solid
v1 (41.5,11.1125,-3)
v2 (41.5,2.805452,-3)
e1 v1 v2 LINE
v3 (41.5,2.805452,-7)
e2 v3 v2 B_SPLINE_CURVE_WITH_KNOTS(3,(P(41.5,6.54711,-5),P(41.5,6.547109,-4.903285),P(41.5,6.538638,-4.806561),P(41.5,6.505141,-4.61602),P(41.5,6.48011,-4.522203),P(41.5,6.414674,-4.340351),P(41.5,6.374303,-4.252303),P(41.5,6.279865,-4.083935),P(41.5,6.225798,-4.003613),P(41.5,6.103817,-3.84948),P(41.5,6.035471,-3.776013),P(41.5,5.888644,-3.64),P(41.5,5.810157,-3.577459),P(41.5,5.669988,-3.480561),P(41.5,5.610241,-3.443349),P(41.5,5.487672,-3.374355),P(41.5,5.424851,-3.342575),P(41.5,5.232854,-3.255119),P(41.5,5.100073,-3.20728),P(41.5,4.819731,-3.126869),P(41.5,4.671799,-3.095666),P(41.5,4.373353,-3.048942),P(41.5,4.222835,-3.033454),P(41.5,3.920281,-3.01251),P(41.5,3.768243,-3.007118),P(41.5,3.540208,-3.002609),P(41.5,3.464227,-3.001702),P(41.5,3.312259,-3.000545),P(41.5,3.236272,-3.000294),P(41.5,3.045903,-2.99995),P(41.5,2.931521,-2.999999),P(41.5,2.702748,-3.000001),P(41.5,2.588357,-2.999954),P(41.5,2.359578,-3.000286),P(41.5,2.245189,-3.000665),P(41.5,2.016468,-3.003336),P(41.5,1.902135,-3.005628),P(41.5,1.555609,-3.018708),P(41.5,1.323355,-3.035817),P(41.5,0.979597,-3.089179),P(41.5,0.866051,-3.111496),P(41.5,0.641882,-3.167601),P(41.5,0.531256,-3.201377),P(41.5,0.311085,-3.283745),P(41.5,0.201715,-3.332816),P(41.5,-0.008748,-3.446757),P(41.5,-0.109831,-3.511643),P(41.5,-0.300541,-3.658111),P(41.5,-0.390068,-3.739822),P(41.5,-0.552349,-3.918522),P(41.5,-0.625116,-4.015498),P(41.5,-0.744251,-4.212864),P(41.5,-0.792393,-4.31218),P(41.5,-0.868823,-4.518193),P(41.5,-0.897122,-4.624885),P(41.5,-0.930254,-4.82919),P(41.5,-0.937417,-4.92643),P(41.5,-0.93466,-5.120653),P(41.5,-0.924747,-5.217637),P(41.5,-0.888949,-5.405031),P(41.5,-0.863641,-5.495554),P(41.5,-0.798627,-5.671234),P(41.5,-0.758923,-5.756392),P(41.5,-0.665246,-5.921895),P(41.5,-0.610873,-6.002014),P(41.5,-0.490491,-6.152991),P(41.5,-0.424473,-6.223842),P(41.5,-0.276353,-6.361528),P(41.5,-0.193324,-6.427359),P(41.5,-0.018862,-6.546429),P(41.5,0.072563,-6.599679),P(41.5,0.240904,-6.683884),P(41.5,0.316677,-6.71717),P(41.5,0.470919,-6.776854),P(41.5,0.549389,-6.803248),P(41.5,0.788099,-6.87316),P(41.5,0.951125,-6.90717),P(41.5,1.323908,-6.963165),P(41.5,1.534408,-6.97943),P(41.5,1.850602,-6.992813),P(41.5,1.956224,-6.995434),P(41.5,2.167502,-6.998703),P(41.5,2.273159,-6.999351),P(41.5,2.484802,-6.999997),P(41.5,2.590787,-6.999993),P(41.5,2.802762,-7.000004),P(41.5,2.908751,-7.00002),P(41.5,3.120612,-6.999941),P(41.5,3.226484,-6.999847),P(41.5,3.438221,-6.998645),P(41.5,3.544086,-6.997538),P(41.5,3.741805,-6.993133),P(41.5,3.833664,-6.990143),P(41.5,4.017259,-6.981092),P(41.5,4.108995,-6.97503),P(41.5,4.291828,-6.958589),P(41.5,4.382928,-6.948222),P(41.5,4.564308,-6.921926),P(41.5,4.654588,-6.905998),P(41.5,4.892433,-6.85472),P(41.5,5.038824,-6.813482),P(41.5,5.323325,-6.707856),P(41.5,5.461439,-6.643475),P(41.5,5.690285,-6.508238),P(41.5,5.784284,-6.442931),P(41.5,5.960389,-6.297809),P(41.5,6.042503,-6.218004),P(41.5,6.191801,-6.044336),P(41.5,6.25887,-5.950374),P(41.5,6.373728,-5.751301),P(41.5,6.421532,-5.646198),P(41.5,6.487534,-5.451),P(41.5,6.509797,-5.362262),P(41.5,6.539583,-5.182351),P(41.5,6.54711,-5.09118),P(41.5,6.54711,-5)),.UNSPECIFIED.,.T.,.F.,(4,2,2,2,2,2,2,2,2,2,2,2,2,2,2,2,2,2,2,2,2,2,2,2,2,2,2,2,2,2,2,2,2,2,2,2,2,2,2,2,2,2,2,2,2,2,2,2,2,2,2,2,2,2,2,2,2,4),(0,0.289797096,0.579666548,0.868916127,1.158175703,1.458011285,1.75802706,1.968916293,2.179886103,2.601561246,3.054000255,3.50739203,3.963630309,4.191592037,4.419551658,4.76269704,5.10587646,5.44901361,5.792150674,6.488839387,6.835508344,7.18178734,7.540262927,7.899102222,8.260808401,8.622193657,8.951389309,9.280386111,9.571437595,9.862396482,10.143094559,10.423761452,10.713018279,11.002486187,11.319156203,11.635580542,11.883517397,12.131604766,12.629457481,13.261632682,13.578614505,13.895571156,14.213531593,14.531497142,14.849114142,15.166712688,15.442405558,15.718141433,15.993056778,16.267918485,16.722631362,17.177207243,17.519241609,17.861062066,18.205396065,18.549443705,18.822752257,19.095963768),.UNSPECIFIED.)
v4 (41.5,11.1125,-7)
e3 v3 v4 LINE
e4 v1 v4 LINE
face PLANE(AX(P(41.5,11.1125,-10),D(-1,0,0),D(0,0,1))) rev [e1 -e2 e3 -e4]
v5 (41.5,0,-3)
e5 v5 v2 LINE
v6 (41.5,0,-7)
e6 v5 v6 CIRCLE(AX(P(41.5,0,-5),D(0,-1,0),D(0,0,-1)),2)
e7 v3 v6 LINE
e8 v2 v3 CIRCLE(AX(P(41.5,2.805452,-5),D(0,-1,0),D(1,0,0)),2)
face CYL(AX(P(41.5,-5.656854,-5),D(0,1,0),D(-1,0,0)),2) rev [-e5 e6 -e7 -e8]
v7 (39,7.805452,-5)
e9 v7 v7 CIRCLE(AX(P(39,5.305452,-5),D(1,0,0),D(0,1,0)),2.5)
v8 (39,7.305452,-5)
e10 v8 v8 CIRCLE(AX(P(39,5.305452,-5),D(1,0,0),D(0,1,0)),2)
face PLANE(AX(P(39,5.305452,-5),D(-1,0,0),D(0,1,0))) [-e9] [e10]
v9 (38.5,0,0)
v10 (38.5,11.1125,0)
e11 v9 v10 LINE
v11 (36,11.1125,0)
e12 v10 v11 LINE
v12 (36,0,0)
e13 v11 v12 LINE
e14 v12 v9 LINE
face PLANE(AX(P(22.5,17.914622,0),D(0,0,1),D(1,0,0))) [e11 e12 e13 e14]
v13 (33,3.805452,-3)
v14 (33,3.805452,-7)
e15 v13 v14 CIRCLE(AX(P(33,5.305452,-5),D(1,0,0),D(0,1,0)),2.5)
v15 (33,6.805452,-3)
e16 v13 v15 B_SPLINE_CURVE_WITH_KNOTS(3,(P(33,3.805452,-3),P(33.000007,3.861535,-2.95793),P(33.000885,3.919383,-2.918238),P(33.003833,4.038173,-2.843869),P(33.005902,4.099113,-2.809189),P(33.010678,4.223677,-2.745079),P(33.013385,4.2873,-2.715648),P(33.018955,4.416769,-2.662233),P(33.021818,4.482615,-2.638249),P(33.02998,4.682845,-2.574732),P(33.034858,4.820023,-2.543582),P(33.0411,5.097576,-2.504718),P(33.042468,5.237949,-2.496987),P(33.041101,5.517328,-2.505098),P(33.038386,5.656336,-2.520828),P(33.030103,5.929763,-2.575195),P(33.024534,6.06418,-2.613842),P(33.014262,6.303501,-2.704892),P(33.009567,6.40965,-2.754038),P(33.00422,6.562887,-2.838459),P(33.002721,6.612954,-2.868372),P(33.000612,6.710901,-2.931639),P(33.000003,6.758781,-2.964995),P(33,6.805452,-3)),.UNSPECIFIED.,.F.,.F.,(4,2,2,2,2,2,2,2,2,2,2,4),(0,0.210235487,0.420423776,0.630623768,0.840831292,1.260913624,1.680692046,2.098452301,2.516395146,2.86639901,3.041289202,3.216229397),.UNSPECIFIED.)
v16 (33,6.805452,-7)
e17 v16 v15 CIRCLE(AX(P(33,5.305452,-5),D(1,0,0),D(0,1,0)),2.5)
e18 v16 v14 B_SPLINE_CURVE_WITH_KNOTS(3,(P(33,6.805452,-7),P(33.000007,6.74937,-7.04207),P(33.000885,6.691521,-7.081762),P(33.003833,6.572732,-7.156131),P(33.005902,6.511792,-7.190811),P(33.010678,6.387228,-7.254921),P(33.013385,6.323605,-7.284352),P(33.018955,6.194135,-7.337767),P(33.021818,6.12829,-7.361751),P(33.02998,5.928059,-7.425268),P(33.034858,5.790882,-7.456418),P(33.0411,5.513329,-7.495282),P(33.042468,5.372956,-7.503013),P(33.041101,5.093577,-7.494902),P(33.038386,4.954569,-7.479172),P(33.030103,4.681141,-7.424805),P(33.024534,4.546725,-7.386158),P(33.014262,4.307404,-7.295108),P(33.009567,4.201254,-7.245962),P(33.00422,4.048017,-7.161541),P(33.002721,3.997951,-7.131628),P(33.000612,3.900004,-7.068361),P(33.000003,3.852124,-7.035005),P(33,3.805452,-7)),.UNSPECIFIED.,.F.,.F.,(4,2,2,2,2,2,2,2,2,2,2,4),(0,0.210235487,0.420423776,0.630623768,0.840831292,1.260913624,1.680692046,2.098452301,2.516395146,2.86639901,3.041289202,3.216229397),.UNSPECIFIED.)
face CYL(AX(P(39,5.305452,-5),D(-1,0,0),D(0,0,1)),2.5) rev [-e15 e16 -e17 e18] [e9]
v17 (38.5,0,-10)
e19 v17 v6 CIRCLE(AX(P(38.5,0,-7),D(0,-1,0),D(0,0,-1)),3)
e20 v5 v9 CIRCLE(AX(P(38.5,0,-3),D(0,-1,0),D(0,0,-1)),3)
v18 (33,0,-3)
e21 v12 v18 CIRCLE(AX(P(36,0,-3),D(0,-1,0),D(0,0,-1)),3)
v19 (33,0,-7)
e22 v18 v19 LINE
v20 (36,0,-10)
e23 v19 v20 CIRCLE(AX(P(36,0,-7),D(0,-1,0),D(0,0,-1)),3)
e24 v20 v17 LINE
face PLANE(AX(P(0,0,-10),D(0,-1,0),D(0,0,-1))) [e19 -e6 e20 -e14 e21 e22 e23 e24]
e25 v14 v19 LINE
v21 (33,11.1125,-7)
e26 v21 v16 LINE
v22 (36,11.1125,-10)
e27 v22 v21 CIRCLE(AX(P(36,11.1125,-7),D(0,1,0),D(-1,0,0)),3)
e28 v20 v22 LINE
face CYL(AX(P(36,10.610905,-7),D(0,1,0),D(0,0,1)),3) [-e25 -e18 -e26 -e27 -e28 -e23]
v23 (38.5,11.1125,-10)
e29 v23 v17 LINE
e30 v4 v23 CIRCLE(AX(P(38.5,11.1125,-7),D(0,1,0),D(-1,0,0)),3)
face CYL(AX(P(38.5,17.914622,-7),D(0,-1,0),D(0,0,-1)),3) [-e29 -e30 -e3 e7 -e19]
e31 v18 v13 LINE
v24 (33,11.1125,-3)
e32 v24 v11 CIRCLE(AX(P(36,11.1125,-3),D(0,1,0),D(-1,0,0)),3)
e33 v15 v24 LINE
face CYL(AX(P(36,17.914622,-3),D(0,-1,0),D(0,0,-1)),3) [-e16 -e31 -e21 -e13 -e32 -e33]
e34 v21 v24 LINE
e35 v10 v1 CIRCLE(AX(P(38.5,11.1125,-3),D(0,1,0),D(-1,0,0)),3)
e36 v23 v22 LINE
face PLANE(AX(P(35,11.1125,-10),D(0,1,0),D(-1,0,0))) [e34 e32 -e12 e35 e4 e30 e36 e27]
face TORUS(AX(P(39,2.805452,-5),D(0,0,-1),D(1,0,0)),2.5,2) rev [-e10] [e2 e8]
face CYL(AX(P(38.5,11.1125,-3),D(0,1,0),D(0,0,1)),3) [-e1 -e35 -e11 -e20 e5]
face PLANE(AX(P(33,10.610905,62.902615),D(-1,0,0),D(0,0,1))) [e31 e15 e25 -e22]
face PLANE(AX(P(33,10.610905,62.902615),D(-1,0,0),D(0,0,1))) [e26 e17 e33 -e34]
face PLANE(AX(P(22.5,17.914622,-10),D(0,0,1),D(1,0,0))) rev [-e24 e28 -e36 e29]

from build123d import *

# Parameters (mm, degrees)
BOSS_EXTRUDE1_DEPTH     = 10
CUT_EXTRUDE2_DEPTH      = 50.456381745
CUT_EXTRUDE2_DEPTH_BACK = 50.456381745
SKETCH3_R               = 2.5
CUT_EXTRUDE3_DEPTH      = 6
SKETCH4_R               = 2
CUT_REVOLVE1_ANGLE      = 90
SKETCH5_R               = 2
CUT_EXTRUDE4_DEPTH      = 2.805452299
FILLET1_R               = 5
SKETCH6_W               = 10
SKETCH6_H               = 29.685485307
CUT_EXTRUDE5_DEPTH      = 33
SKETCH7_W               = 19.76767366
SKETCH7_H               = 10
CUT_EXTRUDE6_DEPTH      = 48.418220859
SKETCH8_W               = 3.5
SKETCH8_H               = 11.210857043
CUT_EXTRUDE7_DEPTH      = 48.41822072
FILLET2_R               = 3


with BuildPart() as part:
    # Sketch1 → Boss-Extrude1 (new body)
    with BuildSketch(Plane.XY):
        with BuildLine():
            Line((0, 0), (45, 0))
            Line((45, 0), (45, 11.1125))
            Line((45, 11.1125), (35, 11.1125))
            add(Edge.make_bspline(
                [(10, 11.1125), (14.576625097, 20.181995974), (30.423374903, 20.181995974), (35, 11.1125)],
                knots=[0, 0, 0, 0, 1, 1, 1, 1], degree=3))
            Line((10, 11.1125), (0, 11.1125))
            Line((0, 11.1125), (0, 0))
        make_face()
    extrude(amount=-BOSS_EXTRUDE1_DEPTH)

    # Sketch2 → Cut-Extrude2 (cut, two sides: drawn at the far end of the back side and taken through both)
    with BuildSketch(Plane.XY.offset(-CUT_EXTRUDE2_DEPTH_BACK)):
        with BuildLine():
            Line((33, 0), (33, 10.610904597))
            add(Edge.make_bspline(
                [(33, 10.610904597), (32.518518069, 11.455367364), (31.27134268, 12.982349636), (27.931157473, 15.20113612), (22.5, 16.390279221), (17.068842527, 15.20113612), (13.72865732, 12.982349636), (12.481481931, 11.455367364), (12, 10.610904597)],
                knots=[0.018308459, 0.018308459, 0.018308459, 0.018308459, 0.138731344, 0.25915423, 0.5, 0.74084577, 0.861268656, 0.981691541, 0.981691541, 0.981691541, 0.981691541], degree=3))
            Line((12, 10.610904597), (12, 0))
            Line((12, 0), (33, 0))
        make_face()
    extrude(amount=CUT_EXTRUDE2_DEPTH + CUT_EXTRUDE2_DEPTH_BACK, mode=Mode.SUBTRACT)

    # Sketch3 → Cut-Extrude3 (cut)
    with BuildSketch(Plane(origin=(12, 0, 0), x_dir=(0, 0, -1), z_dir=(1, 0, 0))):
        with Locations(Location((5, 5.305452299, 0), (0, 0, 90))):
            Circle(SKETCH3_R)
    cut_extrude3 = extrude(amount=-CUT_EXTRUDE3_DEPTH, mode=Mode.SUBTRACT)

    # Sketch4 → Cut-Revolve1 (revolve, cut)
    with BuildSketch(Plane(origin=(6, 0, 0), x_dir=(0, 0, -1), z_dir=(1, 0, 0))):
        with Locations((5, 5.305452299)):
            Circle(SKETCH4_R)
    cut_revolve1 = revolve(axis=Axis((6, 2.805452299, -5), (0, 0, 1)), revolution_arc=CUT_REVOLVE1_ANGLE, mode=Mode.SUBTRACT)

    # Sketch5 → Cut-Extrude4 (cut)
    with BuildSketch(Plane(origin=(0, 2.805452299, 0), x_dir=(1, 0, 0), z_dir=(0, 1, 0))):
        with Locations(Location((3.5, 5, 0), (0, 0, 180))):
            Circle(SKETCH5_R)
    cut_extrude4 = extrude(amount=-CUT_EXTRUDE4_DEPTH, mode=Mode.SUBTRACT)

    # Mirror1: Cut-Extrude3, Cut-Revolve1, Cut-Extrude4 across plane
    add(cut_extrude3.mirror(Plane(origin=(22.5, 0, 0), x_dir=(0, 0, 1), z_dir=(1, 0, 0))), mode=Mode.SUBTRACT)
    add(cut_revolve1.mirror(Plane(origin=(22.5, 0, 0), x_dir=(0, 0, 1), z_dir=(1, 0, 0))), mode=Mode.SUBTRACT)
    add(cut_extrude4.mirror(Plane(origin=(22.5, 0, 0), x_dir=(0, 0, 1), z_dir=(1, 0, 0))), mode=Mode.SUBTRACT)

    # Fillet1
    fillet1_edges = [part.edges().sort_by_distance(p)[0] for p in [
        (10, 11.1125, -5),
        (35, 11.1125, -5),
        (33, 10.610904597, -5),
        (12, 10.610904597, -5),
    ]]
    fillet(fillet1_edges, radius=FILLET1_R)

    # Sketch6 → Cut-Extrude5 (cut)
    with BuildSketch(Plane.ZY):
        with Locations((-5, 14.842742654)):
            Rectangle(SKETCH6_W, SKETCH6_H)
    extrude(amount=-CUT_EXTRUDE5_DEPTH, mode=Mode.SUBTRACT)

    # Sketch7 → Cut-Extrude6 (cut, through all)
    with BuildSketch(Plane(origin=(0, 11.1125, 0), x_dir=(1, 0, 0), z_dir=(0, 1, 0))):
        with Locations((35.11616317, 5)):
            Rectangle(SKETCH7_W, SKETCH7_H)
    extrude(amount=CUT_EXTRUDE6_DEPTH, mode=Mode.SUBTRACT)

    # Sketch8 → Cut-Extrude7 (cut, through all)
    with BuildSketch(Plane.XZ):
        with Locations((43.25, -4.394571478)):
            Rectangle(SKETCH8_W, SKETCH8_H)
    extrude(amount=-CUT_EXTRUDE7_DEPTH, mode=Mode.SUBTRACT)

    # Fillet2
    # the kernel refuses this fillet: 3 mm, written as the material it takes off along each edge
    with BuildSketch(Plane(origin=(33, 18.6125, -10), x_dir=(0, 0, 1), z_dir=(0, -1, 0)), Plane(origin=(33, 18.6125, 0), x_dir=(1, 0, 0), z_dir=(0, -1, 0)), Plane(origin=(41.5, -7.5, -10), x_dir=(0, 0, 1), z_dir=(0, 1, 0))) as fillet2_piece_1:
        with BuildLine():
            CenterArc((FILLET2_R, -FILLET2_R), FILLET2_R, 90, 90)
            Line((0, -FILLET2_R), (0, 0))
            Line((0, 0), (FILLET2_R, 0))
        make_face()
    extrude(amount=26.1125, mode=Mode.SUBTRACT)
    with BuildSketch(Plane(origin=(41.5, 18.6125, 0), x_dir=(-1, 0, 0), z_dir=(0, -1, 0))) as fillet2_piece_2:
        with BuildLine():
            CenterArc((FILLET2_R, FILLET2_R), FILLET2_R, 180, 90)
            Line((0, FILLET2_R), (0, 0))
            Line((0, 0), (FILLET2_R, 0))
        make_face()
    extrude(amount=26.1125, mode=Mode.SUBTRACT)


solid = part.part
